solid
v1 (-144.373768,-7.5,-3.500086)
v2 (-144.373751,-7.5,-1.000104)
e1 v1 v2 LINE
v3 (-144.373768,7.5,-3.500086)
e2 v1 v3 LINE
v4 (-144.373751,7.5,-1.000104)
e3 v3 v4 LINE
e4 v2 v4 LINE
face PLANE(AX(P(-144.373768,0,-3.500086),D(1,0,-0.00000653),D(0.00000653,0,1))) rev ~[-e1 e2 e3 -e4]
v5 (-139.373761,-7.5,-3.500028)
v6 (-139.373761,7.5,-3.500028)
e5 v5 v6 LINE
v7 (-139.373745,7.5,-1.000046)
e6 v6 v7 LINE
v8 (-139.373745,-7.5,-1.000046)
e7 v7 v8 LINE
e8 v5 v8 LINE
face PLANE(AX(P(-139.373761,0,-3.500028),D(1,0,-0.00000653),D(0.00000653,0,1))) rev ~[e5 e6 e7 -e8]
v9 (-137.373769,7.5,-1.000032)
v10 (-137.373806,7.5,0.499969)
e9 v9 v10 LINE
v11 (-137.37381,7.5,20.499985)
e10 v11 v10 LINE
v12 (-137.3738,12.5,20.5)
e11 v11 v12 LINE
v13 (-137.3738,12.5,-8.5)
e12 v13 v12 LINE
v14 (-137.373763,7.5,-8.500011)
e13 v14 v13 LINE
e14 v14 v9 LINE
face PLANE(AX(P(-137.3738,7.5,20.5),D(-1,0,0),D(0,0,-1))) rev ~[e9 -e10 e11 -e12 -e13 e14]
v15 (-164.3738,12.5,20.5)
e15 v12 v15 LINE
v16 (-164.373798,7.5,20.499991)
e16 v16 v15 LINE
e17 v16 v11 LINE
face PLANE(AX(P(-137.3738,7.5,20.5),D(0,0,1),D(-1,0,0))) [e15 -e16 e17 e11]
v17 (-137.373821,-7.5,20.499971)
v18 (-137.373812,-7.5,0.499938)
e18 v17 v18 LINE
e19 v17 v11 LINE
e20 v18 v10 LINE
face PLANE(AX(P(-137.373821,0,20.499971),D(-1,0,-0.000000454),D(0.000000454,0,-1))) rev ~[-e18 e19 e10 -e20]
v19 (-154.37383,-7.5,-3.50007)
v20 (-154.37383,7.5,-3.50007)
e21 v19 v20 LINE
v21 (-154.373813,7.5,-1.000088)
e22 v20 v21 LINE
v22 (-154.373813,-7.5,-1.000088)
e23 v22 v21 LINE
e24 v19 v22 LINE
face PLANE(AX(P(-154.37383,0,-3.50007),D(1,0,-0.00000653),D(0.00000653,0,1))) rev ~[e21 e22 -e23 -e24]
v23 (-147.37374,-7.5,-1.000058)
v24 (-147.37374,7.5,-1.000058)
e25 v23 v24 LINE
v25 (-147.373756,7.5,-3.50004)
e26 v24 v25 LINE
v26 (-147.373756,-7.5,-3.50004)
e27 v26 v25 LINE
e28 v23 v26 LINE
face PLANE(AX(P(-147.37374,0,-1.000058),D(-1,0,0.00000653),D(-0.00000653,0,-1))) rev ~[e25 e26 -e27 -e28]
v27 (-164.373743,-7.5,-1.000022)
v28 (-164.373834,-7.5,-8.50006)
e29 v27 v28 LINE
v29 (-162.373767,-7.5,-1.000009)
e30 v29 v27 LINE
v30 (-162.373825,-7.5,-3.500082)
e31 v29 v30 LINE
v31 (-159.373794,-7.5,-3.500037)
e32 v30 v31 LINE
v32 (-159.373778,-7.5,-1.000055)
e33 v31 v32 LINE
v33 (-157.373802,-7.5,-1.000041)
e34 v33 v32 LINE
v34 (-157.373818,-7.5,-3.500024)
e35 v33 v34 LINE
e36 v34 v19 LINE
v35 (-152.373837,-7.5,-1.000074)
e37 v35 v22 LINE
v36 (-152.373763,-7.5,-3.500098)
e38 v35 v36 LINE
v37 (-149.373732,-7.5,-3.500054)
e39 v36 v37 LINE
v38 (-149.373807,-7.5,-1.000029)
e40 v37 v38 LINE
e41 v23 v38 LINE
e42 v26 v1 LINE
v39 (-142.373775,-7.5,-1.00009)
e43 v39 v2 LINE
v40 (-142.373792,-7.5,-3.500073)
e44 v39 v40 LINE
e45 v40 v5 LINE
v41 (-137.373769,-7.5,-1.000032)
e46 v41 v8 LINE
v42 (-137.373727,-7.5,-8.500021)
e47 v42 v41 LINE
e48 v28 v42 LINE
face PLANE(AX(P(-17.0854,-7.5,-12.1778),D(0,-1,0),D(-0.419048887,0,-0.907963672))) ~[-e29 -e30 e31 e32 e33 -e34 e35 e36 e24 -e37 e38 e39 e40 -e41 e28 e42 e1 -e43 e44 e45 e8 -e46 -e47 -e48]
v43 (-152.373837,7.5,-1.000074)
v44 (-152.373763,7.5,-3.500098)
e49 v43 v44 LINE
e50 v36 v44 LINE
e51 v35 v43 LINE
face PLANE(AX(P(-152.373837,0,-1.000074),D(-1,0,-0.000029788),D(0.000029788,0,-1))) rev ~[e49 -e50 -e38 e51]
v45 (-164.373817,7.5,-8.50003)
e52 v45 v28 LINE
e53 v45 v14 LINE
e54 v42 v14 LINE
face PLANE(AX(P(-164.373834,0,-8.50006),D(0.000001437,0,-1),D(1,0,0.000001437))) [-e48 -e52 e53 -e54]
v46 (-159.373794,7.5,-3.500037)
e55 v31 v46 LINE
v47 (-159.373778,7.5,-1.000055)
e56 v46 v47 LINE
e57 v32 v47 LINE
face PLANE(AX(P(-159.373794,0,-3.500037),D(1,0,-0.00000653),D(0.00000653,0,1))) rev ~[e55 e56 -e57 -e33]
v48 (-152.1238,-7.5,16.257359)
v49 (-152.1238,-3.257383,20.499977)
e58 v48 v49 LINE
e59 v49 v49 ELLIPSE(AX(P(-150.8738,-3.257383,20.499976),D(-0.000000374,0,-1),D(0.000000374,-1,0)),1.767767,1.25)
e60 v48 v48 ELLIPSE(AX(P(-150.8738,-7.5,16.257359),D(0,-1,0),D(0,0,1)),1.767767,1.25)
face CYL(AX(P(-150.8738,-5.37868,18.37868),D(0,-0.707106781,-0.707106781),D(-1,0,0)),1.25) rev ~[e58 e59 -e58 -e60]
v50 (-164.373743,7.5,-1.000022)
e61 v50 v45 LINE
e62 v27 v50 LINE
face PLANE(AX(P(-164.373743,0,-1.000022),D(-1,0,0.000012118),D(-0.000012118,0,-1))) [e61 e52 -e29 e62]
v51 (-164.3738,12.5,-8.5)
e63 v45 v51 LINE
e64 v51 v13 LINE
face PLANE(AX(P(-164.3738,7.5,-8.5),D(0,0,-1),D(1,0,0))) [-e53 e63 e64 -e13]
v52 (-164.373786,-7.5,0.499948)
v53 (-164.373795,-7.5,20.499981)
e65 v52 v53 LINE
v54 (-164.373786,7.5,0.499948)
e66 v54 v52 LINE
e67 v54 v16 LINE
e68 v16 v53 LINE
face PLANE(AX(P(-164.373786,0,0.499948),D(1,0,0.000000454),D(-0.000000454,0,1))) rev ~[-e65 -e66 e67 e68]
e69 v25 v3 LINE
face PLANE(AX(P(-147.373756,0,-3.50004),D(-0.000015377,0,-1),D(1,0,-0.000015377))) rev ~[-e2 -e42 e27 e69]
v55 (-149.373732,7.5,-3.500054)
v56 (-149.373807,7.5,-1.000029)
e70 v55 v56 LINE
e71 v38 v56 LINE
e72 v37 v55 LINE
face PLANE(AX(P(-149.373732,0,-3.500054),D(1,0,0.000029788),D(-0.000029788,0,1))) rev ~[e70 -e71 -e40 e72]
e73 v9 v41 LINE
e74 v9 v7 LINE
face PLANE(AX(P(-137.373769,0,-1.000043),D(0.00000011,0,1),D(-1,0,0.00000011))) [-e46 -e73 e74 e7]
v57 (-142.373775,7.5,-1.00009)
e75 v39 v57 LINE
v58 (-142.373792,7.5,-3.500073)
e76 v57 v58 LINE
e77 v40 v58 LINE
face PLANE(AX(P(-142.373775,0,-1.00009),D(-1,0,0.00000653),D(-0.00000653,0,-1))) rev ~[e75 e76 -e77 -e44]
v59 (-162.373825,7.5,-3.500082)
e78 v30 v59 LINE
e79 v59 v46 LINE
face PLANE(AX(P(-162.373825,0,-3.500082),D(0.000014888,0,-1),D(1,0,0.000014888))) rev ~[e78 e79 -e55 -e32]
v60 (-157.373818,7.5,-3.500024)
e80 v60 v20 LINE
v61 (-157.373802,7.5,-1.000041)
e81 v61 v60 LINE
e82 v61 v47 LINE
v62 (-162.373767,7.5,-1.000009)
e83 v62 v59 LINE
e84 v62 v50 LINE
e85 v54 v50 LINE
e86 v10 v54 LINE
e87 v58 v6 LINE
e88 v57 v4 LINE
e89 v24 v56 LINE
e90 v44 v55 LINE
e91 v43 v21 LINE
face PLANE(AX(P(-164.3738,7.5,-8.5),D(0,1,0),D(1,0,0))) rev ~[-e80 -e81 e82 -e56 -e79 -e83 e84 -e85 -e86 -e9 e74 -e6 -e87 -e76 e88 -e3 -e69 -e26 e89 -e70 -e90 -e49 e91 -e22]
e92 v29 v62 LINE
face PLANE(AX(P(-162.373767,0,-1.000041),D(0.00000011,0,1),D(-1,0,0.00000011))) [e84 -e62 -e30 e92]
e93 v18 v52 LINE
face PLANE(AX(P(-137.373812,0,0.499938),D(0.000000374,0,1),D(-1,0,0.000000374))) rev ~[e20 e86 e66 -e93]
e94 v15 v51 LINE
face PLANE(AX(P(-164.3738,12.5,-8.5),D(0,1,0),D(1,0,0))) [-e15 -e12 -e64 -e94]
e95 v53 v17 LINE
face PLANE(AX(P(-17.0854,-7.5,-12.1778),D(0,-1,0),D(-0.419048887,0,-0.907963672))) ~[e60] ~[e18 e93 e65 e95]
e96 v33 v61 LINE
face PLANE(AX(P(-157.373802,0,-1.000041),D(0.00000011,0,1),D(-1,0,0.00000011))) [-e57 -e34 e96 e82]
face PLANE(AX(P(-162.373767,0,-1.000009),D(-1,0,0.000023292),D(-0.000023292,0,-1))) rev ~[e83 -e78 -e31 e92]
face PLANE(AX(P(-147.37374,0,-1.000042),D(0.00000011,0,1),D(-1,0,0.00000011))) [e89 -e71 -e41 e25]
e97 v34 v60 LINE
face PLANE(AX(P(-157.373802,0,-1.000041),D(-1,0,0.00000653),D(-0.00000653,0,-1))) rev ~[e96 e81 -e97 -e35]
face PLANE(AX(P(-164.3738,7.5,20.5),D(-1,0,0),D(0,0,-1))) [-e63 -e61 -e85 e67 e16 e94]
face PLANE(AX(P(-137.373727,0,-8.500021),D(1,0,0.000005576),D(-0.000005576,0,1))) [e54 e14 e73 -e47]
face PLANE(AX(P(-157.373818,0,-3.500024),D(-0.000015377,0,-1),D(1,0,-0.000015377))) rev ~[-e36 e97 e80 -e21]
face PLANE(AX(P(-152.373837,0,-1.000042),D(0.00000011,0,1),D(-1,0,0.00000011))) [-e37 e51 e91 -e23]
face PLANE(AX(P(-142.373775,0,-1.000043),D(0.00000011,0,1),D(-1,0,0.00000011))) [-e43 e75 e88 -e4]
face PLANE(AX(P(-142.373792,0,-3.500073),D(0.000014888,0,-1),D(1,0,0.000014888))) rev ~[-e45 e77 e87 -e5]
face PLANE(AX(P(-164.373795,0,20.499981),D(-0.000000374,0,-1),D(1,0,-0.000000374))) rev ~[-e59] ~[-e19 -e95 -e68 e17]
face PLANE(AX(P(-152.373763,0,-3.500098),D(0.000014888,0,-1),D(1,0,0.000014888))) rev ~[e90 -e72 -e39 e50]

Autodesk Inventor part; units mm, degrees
ref_plane "YZ Plane" through (0, 0, 0) normal (1, 0, 0) x (0, 1, 0)
ref_plane "Work Plane1" through (-17.0854, 0, -12.1778) normal (0, 1, 0) x (0.4190489, 0, 0.9079637)
sketch "Sketch2" plane through (-17.0854, 0, -12.1778) normal (0, 1, 0) x (0.4190489, 0, 0.9079637)
  line L0 (17.3086, 10.8289) -> (-82.3096, -205.0164) projected
  arc A0 (17.3086, 10.8289) -> (-17.7803, 27.0234) centre (-0.2358, 18.9261) ccw projected
  line L1 (-117.3985, -188.822) -> (-17.7803, 27.0234) projected
  arc A1 (-117.3985, -188.822) -> (-82.3096, -205.0164) centre (-99.8541, -196.9192) ccw projected
  line L2 (-81.4017, -205.4355) -> (18.2166, 10.4099) projected
  arc A2 (-118.3065, -188.4029) -> (-81.4017, -205.4355) centre (-99.8541, -196.9192) ccw projected
  line L3 (-18.6883, 27.4424) -> (-118.3065, -188.4029) projected
  arc A3 (18.2166, 10.4099) -> (-18.6883, 27.4424) centre (-0.2358, 18.9261) ccw projected
  line L4 (-50.7339, -136.6006) -> (-53.0039, -135.553)
  line L5 (-53.0039, -135.553) -> (-51.7467, -132.8291)
  line L6 (-51.7467, -132.8291) -> (-49.4768, -133.8767)
  line L7 (-48.6387, -132.0608) -> (-50.9086, -131.0132)
  line L8 (-50.9086, -131.0132) -> (-49.6515, -128.2893)
  line L9 (-49.6515, -128.2893) -> (-47.3816, -129.3369)
  line L10 (-46.5435, -127.521) -> (-48.8134, -126.4733)
  line L11 (-48.8134, -126.4733) -> (-47.5562, -123.7494)
  line L12 (-47.5562, -123.7494) -> (-45.2863, -124.7971)
  line L13 (-44.4482, -122.9811) -> (-46.7181, -121.9335)
  line L14 (-46.7181, -121.9335) -> (-45.461, -119.2096)
  line L15 (-45.461, -119.2096) -> (-43.1911, -120.2572)
  line L16 (-42.353, -118.4413) -> (-44.6229, -117.3937)
  line L17 (-44.6229, -117.3937) -> (-43.3657, -114.6698)
  line L18 (-43.3657, -114.6698) -> (-41.0958, -115.7174)
  line L19 (-51.572, -138.4165) -> (-58.3818, -135.2737)
  line L20 (-58.3818, -135.2737) -> (-47.0674, -110.7586)
  line L21 (-47.0674, -110.7586) -> (-40.2577, -113.9015)
  line L22 (-53.8419, -137.3689) -> (-53.0039, -135.553) construction
  line L23 (-51.7467, -132.8291) -> (-50.9086, -131.0132) construction
  line L24 (-43.3657, -114.6698) -> (-42.5276, -112.8539) construction
  line L25 (-40.2577, -113.9015) -> (-38.8958, -114.5301) construction
  line L26 (-38.8958, -114.5301) -> (-50.2101, -139.0451)
  line L27 (-50.2101, -139.0451) -> (-32.0508, -147.4261)
  line L28 (-32.0508, -147.4261) -> (-20.7365, -122.9111)
  line L29 (-20.7365, -122.9111) -> (-38.8958, -114.5301)
  point P0 (-48.6387, -132.0608)
  point P1 (-47.3816, -129.3369)
  point P2 (-45.2863, -124.7971)
  point P3 (-44.4482, -122.9811)
  point P4 (-43.1911, -120.2572)
  point P5 (-42.353, -118.4413)
  point P6 (-41.0958, -115.7174)
  dimension "d9" = 2.5
  dimension "d10" = 3
  dimension "d13" = 5
  dimension "d18" = 5
  dimension "d21" = 1.5
  dimension "d22" = 20
ref_plane "Work Plane2" through (-258.0475, 7.5, -40.6457) normal (0, 1, 0) x (0, 0, 1)
ref_plane "Work Plane3" through (-258.0475, 7.5, -40.6457) normal (0, 1, 0) x (0, 0, 1)
extrude "Extrusion2" add sketch "Sketch2" along normal up to surface (7.5 mm away) contours L0 L18 L17 L16 L15 L14 L13 L12 L11 L10 L9 L8 L7 L6 L5 L4 L19 L20 L21 | L29 L28 L27 L26
sketch "Sketch3" plane through (-164.3738, 7.5, -8.5) normal (0, 1, 0) x (1, 0, 0)
  line L0 (27, -29) -> (27, -9) projected
  line L1 (0, 0) -> (27, 0)
  line L2 (27, 0) -> (27, -29)
  line L3 (27, -29) -> (0, -29)
  line L4 (0, -29) -> (0, 0)
  point P0 (164.3738, -8.5)
extrude "Extrusion3" add sketch "Sketch3" along normal blind 5
mirror "Mirror1" about plane through (-150.8738, 0, 10.5) normal (0, -1, 0) of "Extrusion2"
ref_plane "Work Plane4" through (-157.6238, -7.5, 20.5) normal (0, -0.7071068, -0.7071068) x (-1, 0, 0)
sketch "Sketch4" plane through (-157.6238, -7.5, 20.5) normal (0, -0.7071068, -0.7071068) x (-1, 0, 0)
  circle A0 centre (-6.75, 3) radius 1.25
  line L0 (-20.25, 28.2843) -> (6.75, 28.2843) projected
  line L1 (6.75, 28.2843) -> (6.75, 0) projected
  line L2 (6.75, 0) -> (-20.25, 0) projected
  line L3 (-20.25, 0) -> (-20.25, 28.2843) projected
  line L4 (-6.75, 3) -> (-6.75, 0) construction
  point P0 (-157.6238, 19.799)
  dimension "d28" = 2.5
  dimension "d29" = 3
extrude "Extrusion4" cut sketch "Sketch4" against normal through all contours A0
extrude "Extrusion5" cut sketch "Sketch4" along normal through all contours A0
properties part number "Belt Clip"
